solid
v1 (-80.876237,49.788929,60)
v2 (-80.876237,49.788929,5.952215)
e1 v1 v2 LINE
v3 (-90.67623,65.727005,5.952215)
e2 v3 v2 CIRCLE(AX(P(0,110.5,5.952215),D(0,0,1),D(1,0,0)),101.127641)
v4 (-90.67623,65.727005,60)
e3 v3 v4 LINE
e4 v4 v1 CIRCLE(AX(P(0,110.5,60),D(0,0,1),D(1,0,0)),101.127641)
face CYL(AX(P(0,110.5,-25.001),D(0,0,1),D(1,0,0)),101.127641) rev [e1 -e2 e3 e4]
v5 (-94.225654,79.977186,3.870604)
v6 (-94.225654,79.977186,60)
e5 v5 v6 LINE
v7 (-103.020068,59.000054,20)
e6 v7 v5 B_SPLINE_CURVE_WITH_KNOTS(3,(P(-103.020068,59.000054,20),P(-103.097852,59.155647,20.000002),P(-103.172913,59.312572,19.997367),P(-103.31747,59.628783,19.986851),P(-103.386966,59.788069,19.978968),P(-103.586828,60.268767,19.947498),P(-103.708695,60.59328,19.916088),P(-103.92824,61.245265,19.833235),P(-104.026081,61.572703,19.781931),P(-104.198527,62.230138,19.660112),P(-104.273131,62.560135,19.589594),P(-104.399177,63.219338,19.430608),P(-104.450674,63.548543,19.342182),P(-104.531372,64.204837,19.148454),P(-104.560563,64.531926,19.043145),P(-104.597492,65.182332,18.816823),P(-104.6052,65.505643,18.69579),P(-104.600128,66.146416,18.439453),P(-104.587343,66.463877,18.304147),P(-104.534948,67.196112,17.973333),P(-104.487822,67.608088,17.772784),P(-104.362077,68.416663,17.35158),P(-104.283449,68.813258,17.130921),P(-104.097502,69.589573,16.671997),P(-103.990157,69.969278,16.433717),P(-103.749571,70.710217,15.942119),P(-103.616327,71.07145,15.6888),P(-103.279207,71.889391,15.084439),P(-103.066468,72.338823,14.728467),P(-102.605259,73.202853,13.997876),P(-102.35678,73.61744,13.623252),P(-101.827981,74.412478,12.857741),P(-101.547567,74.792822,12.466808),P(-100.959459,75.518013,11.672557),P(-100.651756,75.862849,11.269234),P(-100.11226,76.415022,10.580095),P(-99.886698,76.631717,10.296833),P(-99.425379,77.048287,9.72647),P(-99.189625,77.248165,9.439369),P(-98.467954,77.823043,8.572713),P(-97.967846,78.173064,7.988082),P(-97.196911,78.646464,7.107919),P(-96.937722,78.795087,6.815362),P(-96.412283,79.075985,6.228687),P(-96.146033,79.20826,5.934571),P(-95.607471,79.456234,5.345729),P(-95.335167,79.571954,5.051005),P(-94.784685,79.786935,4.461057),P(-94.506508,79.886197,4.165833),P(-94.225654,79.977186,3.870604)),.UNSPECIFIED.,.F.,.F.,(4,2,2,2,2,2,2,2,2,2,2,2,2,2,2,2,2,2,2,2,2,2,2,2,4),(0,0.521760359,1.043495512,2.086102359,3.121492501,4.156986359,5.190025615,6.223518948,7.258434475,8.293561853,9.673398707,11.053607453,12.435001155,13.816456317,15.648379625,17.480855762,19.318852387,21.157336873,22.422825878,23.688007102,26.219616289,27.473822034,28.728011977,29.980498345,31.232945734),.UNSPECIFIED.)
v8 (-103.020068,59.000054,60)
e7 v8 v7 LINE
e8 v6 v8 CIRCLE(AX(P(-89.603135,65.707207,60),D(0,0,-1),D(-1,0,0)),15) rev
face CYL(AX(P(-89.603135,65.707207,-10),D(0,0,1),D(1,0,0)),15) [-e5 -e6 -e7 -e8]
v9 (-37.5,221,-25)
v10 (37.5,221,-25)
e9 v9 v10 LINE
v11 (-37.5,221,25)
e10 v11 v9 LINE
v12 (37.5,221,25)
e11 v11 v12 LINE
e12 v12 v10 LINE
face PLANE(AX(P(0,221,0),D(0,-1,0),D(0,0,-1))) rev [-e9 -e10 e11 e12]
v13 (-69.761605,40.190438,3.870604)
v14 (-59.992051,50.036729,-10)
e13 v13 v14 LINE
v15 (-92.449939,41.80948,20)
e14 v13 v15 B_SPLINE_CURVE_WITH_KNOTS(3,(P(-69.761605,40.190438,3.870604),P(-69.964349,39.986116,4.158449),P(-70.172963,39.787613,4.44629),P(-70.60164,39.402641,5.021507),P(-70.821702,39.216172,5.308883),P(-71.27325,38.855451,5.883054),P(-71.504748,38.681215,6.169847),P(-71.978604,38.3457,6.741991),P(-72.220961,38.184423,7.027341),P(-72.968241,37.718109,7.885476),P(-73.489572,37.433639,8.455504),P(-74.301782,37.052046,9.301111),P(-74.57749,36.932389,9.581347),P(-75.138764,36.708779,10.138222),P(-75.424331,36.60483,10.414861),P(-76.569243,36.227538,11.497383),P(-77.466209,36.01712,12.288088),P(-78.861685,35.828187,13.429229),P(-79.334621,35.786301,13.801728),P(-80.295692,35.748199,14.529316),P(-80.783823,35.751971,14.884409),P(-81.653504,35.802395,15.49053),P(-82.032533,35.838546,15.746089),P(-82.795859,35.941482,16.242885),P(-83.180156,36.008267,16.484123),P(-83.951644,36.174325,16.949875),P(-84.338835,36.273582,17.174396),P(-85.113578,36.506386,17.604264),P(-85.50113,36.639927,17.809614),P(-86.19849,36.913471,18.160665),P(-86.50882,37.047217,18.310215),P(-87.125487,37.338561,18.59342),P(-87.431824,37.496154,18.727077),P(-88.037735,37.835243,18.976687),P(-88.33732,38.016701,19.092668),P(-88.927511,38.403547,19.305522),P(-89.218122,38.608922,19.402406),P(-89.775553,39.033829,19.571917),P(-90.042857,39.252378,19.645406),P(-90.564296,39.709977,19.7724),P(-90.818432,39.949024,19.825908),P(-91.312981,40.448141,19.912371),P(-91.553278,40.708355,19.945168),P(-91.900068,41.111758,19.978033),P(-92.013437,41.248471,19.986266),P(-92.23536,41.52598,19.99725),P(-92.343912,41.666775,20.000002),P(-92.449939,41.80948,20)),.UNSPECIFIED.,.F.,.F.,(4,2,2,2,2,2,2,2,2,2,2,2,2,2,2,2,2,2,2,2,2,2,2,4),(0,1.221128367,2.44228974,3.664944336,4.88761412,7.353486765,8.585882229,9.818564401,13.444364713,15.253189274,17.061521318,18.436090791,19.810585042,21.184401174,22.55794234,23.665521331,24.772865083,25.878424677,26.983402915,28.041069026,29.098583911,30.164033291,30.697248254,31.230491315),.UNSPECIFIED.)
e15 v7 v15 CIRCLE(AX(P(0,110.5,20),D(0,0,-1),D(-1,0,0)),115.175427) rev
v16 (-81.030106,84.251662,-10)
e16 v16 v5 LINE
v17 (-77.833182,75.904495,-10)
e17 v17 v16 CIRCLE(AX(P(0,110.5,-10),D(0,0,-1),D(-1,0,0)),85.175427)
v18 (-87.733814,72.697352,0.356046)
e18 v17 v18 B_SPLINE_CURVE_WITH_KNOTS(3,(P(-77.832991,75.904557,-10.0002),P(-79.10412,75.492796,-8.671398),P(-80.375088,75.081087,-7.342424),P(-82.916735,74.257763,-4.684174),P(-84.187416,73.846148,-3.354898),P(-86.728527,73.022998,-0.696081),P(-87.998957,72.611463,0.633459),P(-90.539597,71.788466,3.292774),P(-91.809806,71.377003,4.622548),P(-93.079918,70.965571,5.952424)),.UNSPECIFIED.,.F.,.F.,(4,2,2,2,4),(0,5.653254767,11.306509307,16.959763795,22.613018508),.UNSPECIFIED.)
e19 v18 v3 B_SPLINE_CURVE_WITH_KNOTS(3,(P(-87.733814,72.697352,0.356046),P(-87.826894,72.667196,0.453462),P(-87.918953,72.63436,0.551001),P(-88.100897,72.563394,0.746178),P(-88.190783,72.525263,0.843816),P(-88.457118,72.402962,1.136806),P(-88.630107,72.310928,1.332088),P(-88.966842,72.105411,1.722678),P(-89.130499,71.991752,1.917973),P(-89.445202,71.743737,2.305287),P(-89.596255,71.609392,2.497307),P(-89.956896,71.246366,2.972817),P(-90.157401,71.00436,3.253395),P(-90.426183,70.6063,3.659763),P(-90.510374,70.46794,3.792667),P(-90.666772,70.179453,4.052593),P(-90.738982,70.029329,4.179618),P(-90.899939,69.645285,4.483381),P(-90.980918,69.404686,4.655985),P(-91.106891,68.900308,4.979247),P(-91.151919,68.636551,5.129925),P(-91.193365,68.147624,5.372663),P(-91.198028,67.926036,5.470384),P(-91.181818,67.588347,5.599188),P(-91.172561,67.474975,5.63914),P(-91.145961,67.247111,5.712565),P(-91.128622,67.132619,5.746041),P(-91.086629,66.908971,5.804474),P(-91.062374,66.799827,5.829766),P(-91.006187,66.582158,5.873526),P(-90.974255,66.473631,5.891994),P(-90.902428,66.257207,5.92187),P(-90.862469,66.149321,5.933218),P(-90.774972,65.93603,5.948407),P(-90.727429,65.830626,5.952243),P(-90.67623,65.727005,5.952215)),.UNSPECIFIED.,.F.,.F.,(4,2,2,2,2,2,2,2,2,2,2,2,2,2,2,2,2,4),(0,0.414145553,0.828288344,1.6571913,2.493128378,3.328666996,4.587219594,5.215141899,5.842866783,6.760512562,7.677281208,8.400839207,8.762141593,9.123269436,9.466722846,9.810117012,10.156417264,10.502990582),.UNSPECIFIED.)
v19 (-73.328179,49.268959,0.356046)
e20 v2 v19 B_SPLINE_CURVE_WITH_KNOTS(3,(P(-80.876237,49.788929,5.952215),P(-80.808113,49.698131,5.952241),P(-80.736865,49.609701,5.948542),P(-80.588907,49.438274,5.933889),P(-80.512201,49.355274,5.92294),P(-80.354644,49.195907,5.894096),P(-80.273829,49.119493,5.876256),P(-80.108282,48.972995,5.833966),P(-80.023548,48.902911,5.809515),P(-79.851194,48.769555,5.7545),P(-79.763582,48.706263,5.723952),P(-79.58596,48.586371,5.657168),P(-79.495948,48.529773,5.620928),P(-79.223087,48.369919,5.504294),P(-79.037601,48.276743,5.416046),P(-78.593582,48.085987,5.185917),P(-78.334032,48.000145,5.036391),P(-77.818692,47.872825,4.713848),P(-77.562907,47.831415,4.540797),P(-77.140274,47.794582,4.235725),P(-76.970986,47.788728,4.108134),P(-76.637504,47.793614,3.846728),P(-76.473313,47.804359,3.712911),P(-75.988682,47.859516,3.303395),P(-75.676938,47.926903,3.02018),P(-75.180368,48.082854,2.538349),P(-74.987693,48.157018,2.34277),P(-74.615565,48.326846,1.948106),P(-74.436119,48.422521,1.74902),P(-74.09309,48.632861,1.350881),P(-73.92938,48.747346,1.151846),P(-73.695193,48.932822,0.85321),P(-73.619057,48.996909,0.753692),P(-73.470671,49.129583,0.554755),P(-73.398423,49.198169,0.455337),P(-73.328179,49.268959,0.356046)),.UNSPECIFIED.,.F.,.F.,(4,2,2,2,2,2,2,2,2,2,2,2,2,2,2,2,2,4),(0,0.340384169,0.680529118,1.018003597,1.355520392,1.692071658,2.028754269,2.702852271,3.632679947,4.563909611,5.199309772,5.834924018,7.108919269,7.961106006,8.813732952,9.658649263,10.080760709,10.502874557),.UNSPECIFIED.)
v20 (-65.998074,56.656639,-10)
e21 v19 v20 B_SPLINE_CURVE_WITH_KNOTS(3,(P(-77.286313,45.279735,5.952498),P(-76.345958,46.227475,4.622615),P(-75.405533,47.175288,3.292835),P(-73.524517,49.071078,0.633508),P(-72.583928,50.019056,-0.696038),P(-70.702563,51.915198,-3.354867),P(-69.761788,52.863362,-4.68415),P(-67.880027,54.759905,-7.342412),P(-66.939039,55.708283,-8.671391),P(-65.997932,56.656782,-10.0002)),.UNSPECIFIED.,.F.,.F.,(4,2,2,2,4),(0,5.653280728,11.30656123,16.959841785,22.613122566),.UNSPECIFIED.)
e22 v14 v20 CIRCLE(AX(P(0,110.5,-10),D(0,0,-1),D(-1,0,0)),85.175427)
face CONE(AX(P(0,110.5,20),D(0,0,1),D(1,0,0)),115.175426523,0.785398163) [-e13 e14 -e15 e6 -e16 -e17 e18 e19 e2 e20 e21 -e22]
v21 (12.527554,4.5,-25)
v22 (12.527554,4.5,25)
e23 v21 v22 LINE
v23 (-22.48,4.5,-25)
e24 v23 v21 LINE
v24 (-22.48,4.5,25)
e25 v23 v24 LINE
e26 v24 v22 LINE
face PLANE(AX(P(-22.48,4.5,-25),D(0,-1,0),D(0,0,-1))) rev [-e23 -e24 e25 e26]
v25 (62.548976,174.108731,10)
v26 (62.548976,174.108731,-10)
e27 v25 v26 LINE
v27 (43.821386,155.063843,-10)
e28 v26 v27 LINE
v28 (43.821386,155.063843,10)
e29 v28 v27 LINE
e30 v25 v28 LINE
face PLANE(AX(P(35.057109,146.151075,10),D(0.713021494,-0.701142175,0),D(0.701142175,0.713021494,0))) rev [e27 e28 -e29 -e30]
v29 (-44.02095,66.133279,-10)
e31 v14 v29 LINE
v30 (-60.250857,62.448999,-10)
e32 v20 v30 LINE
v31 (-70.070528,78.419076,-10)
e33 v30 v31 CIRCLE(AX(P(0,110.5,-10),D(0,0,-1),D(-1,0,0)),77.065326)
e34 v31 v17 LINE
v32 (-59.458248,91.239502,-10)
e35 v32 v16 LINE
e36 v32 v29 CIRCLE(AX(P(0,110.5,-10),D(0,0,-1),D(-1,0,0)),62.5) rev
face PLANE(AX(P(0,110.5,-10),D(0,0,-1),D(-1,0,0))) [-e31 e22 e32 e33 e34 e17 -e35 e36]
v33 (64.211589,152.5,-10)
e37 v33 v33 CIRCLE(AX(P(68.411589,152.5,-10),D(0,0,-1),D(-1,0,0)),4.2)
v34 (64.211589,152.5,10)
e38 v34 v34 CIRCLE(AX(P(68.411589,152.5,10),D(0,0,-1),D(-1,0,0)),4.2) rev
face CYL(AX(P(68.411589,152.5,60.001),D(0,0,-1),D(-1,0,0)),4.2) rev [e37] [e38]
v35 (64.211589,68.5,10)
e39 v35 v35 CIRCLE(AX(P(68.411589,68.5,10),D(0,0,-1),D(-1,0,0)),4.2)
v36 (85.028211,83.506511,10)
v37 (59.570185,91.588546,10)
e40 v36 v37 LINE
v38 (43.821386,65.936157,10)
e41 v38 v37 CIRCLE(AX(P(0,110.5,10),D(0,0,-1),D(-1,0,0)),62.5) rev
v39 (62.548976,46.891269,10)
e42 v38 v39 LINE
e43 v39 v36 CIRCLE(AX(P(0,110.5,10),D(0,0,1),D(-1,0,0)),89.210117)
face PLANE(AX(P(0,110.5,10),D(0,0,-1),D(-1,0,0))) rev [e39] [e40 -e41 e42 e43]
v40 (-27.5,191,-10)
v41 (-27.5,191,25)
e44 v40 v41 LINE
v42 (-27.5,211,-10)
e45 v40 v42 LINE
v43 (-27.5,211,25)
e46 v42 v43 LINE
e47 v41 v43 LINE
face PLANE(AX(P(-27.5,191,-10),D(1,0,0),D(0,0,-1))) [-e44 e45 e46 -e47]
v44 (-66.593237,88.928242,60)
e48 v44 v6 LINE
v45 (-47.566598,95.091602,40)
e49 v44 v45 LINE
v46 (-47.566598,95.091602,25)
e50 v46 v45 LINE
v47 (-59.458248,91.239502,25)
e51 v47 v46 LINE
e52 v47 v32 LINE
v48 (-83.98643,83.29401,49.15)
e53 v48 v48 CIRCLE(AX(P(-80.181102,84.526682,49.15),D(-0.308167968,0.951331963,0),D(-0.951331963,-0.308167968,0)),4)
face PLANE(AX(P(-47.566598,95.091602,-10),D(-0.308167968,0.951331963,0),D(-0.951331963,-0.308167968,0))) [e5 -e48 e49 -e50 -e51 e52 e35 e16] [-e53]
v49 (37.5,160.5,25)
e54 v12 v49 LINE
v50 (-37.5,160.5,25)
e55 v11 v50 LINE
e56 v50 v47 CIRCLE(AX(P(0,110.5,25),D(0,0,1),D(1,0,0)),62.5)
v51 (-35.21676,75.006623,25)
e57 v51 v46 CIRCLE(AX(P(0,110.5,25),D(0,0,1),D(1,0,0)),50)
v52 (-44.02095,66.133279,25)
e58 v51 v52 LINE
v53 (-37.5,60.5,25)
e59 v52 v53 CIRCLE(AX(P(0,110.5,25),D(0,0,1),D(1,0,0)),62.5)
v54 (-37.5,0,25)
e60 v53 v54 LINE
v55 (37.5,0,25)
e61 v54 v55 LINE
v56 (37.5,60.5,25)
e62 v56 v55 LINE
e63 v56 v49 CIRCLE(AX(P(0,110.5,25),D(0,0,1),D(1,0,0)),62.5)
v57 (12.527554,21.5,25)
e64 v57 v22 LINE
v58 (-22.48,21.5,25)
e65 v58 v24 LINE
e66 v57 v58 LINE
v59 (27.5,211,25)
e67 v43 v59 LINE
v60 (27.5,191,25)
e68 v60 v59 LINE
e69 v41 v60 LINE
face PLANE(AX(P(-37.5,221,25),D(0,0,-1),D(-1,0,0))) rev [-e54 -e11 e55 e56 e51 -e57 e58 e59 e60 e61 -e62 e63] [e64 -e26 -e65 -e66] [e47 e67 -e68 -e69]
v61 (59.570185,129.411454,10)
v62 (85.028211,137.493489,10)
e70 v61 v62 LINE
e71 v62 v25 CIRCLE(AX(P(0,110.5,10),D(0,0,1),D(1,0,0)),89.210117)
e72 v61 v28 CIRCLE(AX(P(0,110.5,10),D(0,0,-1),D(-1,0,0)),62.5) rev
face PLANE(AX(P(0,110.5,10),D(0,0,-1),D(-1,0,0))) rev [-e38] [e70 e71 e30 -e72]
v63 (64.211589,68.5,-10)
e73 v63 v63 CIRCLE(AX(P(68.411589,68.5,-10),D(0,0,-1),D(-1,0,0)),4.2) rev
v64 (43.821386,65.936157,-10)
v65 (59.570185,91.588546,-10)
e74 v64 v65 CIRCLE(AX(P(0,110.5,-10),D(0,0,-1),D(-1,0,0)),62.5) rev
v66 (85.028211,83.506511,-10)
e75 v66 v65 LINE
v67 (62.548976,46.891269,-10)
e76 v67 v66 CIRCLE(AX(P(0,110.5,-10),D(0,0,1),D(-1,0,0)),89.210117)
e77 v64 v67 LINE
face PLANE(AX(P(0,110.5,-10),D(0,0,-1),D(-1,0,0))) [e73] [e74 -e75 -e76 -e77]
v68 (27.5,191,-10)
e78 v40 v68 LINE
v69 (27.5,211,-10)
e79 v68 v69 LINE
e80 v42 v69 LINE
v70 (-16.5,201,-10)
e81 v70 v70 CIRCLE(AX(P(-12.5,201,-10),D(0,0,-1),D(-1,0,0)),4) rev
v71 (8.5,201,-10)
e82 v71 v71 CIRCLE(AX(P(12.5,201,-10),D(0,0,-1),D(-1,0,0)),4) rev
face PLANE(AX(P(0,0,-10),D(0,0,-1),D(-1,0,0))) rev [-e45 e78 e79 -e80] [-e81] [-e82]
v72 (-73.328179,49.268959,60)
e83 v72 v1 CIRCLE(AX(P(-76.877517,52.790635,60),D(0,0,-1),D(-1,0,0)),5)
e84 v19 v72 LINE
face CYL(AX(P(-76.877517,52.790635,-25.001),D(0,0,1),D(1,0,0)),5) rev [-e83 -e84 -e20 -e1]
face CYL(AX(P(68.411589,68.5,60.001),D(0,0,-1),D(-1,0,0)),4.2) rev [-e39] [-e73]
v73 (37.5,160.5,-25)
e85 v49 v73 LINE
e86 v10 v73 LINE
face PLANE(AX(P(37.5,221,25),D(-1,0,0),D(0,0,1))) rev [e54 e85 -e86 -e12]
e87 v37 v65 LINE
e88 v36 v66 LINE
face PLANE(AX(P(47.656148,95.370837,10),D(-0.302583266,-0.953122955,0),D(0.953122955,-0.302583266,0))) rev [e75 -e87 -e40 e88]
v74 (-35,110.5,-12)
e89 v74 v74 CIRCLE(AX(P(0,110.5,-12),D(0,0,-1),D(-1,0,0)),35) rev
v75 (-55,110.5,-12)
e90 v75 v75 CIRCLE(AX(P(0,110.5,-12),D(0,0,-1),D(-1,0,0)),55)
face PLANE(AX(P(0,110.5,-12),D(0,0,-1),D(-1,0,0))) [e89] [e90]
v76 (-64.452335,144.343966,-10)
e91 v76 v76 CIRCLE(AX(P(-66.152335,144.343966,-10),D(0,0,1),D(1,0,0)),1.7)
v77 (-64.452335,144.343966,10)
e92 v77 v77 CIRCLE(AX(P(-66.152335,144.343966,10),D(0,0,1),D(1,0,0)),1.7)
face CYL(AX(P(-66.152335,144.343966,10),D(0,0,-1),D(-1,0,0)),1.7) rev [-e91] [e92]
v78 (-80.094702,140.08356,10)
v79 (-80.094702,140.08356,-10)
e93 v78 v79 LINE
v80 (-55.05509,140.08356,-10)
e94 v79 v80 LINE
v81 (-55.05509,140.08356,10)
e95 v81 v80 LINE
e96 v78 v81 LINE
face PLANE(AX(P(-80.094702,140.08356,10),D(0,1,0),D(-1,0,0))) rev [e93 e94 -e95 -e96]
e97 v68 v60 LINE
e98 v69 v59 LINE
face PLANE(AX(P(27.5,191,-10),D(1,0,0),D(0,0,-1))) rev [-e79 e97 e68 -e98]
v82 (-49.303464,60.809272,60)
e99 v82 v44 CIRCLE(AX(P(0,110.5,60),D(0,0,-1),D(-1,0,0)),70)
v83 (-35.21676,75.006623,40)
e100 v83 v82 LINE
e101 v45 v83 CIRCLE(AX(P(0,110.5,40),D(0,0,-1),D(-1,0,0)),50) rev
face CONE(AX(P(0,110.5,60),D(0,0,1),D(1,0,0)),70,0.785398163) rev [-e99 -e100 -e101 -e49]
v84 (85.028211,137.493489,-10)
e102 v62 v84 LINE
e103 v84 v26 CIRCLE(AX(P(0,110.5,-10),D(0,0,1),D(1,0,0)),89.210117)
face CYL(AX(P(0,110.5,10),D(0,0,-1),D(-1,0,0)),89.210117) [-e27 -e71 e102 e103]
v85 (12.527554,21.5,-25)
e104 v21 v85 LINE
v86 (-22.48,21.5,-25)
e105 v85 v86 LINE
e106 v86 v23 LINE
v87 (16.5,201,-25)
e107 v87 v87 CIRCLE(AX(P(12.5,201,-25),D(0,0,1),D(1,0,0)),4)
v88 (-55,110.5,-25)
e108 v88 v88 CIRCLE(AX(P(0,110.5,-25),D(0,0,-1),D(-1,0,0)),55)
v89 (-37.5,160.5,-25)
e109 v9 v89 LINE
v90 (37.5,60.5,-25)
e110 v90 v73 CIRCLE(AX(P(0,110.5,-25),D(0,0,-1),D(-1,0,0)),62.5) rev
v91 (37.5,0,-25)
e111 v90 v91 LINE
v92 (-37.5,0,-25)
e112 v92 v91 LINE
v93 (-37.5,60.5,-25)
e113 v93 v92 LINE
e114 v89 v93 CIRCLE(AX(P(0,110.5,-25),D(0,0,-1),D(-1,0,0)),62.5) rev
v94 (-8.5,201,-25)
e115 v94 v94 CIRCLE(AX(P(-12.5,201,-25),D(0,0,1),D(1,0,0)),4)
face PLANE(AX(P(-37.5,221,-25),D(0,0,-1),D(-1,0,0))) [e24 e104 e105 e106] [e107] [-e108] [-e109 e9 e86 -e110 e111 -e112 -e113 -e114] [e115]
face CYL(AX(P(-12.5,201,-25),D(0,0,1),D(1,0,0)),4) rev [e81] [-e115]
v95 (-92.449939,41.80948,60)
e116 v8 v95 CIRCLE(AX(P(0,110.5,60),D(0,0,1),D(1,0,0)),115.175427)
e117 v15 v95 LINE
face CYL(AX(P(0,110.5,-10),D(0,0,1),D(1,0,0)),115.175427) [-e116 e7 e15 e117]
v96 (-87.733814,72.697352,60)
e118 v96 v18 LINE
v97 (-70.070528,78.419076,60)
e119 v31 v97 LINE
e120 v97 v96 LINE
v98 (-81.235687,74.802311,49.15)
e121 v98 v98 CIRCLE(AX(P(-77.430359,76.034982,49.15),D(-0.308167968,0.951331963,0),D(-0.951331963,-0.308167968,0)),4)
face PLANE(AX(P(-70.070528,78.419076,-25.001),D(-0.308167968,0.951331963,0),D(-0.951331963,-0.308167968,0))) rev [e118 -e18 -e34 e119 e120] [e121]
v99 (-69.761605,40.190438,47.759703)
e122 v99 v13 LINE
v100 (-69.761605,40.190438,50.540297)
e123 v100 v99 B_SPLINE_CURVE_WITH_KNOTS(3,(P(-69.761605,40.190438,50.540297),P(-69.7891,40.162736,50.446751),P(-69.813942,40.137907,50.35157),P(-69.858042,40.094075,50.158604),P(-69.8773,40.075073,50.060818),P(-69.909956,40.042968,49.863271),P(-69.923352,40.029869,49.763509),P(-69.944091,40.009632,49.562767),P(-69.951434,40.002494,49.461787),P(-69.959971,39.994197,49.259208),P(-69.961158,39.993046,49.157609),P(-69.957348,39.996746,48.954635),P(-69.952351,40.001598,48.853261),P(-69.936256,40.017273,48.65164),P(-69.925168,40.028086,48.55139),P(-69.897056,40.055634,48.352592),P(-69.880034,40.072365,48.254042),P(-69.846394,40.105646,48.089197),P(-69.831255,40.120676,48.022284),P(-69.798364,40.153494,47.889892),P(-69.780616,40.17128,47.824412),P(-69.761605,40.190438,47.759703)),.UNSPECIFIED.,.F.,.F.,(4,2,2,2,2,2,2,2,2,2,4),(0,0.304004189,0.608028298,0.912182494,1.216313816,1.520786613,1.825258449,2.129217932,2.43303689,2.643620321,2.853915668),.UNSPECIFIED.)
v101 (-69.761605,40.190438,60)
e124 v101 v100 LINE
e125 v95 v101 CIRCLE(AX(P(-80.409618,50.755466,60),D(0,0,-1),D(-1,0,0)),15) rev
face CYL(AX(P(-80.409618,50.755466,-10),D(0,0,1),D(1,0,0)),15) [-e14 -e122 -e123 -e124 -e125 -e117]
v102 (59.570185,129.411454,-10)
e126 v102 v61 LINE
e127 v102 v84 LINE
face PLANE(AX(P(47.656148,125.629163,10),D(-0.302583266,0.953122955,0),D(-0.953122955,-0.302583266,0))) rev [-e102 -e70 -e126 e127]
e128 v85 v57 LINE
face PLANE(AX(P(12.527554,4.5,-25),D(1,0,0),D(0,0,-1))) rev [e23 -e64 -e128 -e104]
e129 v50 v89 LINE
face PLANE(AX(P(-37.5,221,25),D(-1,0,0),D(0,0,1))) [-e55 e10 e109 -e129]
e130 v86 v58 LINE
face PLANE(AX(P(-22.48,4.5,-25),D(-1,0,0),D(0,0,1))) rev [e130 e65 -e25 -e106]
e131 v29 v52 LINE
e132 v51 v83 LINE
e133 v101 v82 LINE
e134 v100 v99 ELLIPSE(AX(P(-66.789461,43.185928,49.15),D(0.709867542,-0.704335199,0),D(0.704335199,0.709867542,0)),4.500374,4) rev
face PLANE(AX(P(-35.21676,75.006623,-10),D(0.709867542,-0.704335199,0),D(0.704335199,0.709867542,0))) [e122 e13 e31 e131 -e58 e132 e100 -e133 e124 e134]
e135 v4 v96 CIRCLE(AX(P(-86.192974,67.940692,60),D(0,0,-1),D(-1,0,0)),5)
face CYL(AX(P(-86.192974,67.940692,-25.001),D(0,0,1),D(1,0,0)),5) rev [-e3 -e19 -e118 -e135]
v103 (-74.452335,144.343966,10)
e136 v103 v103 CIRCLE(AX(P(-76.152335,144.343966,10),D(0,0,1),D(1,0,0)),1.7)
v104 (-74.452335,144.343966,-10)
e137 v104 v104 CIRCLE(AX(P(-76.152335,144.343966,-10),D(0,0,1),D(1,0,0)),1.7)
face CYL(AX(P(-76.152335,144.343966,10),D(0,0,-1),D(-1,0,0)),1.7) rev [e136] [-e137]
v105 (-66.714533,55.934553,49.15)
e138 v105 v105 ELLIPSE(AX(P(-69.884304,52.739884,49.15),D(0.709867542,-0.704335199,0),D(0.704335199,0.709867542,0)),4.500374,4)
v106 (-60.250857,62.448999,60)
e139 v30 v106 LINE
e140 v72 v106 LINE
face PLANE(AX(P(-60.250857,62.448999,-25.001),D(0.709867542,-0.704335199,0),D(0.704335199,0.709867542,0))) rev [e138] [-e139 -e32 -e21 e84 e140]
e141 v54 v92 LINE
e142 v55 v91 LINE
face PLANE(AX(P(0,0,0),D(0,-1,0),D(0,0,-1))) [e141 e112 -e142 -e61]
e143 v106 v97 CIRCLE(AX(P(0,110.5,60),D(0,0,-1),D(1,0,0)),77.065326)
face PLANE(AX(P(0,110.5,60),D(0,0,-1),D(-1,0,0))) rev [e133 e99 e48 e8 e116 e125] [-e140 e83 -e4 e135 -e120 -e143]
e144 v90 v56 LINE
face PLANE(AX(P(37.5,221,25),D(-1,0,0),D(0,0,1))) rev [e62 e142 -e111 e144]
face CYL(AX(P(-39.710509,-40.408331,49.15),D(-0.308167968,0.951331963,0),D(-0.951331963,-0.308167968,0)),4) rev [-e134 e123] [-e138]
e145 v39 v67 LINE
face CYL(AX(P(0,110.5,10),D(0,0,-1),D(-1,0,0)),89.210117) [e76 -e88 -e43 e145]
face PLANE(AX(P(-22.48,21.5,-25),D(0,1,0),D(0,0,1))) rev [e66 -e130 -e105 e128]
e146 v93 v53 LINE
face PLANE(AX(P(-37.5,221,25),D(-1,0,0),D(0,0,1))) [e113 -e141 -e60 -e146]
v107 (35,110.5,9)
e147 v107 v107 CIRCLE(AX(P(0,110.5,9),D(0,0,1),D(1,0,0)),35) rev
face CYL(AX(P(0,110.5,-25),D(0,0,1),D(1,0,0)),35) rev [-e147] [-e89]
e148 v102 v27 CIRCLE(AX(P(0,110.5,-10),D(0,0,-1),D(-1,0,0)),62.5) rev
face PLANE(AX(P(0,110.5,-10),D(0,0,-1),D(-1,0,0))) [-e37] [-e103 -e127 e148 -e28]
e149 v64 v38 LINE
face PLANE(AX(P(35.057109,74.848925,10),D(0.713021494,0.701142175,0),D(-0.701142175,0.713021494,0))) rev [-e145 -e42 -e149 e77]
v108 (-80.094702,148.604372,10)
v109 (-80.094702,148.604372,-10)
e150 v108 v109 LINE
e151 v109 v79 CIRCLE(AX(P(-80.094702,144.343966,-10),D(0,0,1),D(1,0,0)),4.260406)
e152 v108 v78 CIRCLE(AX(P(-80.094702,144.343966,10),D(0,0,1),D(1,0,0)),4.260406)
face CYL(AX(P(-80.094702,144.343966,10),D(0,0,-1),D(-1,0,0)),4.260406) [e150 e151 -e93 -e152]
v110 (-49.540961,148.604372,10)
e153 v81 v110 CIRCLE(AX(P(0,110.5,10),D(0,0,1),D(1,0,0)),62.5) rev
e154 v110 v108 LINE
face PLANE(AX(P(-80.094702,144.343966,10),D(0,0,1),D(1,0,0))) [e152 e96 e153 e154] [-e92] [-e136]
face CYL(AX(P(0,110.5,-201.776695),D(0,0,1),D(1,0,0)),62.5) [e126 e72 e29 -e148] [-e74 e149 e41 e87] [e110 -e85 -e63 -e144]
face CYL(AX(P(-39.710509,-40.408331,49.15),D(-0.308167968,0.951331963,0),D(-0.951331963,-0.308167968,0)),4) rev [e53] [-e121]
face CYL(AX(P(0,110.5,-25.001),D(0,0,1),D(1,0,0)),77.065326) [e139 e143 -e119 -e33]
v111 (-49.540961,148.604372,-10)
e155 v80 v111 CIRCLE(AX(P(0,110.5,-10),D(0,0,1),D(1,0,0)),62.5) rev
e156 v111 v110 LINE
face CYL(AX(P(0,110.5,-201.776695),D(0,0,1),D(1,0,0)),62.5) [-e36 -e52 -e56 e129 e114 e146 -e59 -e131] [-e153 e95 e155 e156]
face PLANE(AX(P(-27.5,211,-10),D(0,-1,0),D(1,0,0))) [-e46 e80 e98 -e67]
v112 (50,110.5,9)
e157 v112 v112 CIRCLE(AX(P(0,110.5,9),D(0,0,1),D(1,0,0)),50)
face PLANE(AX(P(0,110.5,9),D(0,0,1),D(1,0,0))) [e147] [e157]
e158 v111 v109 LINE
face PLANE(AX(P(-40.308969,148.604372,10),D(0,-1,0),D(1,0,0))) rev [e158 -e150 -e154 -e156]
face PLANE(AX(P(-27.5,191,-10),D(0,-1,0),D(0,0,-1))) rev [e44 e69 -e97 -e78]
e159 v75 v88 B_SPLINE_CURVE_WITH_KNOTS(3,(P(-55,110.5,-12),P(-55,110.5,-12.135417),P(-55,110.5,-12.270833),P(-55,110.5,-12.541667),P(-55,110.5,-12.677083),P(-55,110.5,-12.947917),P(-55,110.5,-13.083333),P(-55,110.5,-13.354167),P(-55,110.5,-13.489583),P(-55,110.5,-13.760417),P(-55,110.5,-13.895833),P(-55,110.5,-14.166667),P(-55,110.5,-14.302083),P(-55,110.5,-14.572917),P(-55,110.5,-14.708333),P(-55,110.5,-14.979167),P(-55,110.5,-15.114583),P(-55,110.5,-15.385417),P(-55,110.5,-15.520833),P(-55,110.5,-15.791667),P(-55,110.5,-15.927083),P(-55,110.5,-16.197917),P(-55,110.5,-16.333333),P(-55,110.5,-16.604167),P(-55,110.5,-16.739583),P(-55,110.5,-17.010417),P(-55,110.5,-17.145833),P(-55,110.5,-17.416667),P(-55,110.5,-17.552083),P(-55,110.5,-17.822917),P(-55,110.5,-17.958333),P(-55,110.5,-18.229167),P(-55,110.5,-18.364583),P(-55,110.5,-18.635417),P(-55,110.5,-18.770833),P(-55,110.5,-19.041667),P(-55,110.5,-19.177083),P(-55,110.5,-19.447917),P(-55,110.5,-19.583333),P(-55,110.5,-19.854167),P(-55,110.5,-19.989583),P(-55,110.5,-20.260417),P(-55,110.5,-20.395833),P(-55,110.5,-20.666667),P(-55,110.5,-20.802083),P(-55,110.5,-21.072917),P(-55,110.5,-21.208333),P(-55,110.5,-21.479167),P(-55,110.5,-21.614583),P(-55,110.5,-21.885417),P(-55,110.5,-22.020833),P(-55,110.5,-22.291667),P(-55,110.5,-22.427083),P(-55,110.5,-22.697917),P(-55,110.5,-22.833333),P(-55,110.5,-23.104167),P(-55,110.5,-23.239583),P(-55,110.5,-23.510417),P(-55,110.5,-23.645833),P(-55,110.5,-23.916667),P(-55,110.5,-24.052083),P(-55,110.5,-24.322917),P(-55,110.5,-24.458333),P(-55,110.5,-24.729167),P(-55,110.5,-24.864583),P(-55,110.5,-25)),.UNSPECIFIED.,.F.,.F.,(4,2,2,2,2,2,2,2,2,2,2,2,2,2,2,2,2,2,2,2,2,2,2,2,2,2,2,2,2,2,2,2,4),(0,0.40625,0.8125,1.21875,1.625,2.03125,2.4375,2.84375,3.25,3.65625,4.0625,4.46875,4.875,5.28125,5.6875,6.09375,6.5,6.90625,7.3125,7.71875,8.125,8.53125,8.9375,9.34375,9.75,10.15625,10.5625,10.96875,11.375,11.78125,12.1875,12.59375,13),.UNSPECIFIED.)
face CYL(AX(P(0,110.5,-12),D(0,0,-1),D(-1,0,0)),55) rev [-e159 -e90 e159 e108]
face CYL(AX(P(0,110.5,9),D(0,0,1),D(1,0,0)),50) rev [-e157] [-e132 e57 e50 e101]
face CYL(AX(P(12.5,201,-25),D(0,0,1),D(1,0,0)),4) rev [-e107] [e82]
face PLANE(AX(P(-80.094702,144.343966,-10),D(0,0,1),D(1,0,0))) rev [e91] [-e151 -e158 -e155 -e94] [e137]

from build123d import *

# Parameters (mm, degrees)
SKETCH1_W                          = 75
SKETCH1_H                          = 50.00000000000001
BE_MAIN_UPRIGHT_BODY_DEPTH         = 221
SKETCH19_R                         = 62.5
BOSS_EXTRUDE1_DEPTH                = 50
SKETCH4_R                          = 35
CE_THROUGH_HOLE_DEPTH              = 236.04733565816056
SKETCH2_R                          = 50
CE_INNER_BEARING_DEPTH             = 16
SKETCH3_R                          = 55
CE_OUTER_BEARING_DEPTH             = 13
BE_CALIPER_MOUNT_V2_DEPTH          = 10
BE_TIE_ROD_MOUNT_V2_DEPTH          = 60.00000000000001
BE_TIE_ROD_MOUNT_V2_DEPTH_BACK     = 9.999999999999996
SKETCH32_R                         = 1.7000000000000146
BE_TEMP_SENSOR_MOUNT_V3_DEPTH      = 10
CE_CALIPER_HOLES_REACH             = 255.863
SKETCH26_R                         = 4.199999999999994
SKETCH26_R_2                       = 4.1999999999999975
CE_CALIPER_HOLES_DIRECTION_2_REACH = 255.863
SKETCH12_R                         = 4.0000000000000036
SKETCH12_R_2                       = 4
CE_TOP_CLEVIS_HOLES_DEPTH          = 252.68750278067682
CE_TOP_CLEVIS_SPACE_DEPTH          = 35
CE_BOTTOM_CLEVIS_SPACE_DEPTH       = 252.68750278067682
SKETCH15_W                         = 25.000000000000004
SKETCH15_H                         = 5
CE_EXPAND_BOTTOM_CLEVIS_DEPTH      = 252.68750278067682
CE_WIDEN_BOTTOM_CLEVIS_DEPTH       = 249.87031277664735
CE_WIDEN_BOTTOM_CLEVIS_DEPTH_BACK  = 249.87031277664735
SKETCH16_W                         = 10.00755403153164
SKETCH16_H                         = 17
CHAMFER1_SIZE                      = 20
CHAMFER2_SIZE                      = 30
CUT_EXTRUDE1_REACH                 = 180.963
SKETCH28_R                         = 4.000000000000007
CUT_EXTRUDE2_REACH                 = 262.905
FILLET2_R                          = 15
FILLET3_R                          = 5


with BuildPart() as part:
    # Sketch1 → BE - main upright body (new body)
    with BuildSketch(Plane(origin=(0, 0, 0), x_dir=(1, 0, 0), z_dir=(0, 1, 0))):
        Rectangle(SKETCH1_W, SKETCH1_H)
    extrude(amount=BE_MAIN_UPRIGHT_BODY_DEPTH)

    # Sketch19 → Boss-Extrude1 (add)
    with BuildSketch(Plane.XY.offset(25)):
        with Locations((0, 110.5)):
            Circle(SKETCH19_R)
    extrude(amount=-BOSS_EXTRUDE1_DEPTH)

    # Sketch4 → CE - Through hole (cut, through all)
    with BuildSketch(Plane.XY.offset(25)):
        with Locations((6.57e-15, 110.5)):
            Circle(SKETCH4_R)
    extrude(amount=-CE_THROUGH_HOLE_DEPTH, mode=Mode.SUBTRACT)

    # Sketch2 → CE - Inner bearing (cut)
    with BuildSketch(Plane.XY.offset(25)):
        with Locations((5.2e-15, 110.5)):
            Circle(SKETCH2_R)
    extrude(amount=-CE_INNER_BEARING_DEPTH, mode=Mode.SUBTRACT)

    # Sketch3 → CE - Outer bearing (cut)
    with BuildSketch(Plane(origin=(0, 0, -25), x_dir=(-1, 0, 0), z_dir=(0, 0, -1))):
        with Locations((0, 110.5)):
            Circle(SKETCH3_R)
    extrude(amount=-CE_OUTER_BEARING_DEPTH, mode=Mode.SUBTRACT)

    # Sketch23 → BE - caliper mount v2 (add, symmetric)
    with BuildSketch(Plane.XY):
        with BuildLine():
            Line((35.05710874811726, 146.15107468538196), (62.54897572629606, 174.1087311459216))
            ThreePointArc((62.54897572629606, 174.1087311459216), (76.02582114581824, 157.1746136728197), (85.02821067036592, 137.4934887074417))
            Line((85.02821067036592, 137.4934887074417), (47.65614773889368, 125.62916331753813))
            ThreePointArc((47.65614773889368, 125.62916331753813), (42.610537560783285, 136.65993288946052), (35.05710874811726, 146.15107468538196))
        make_face()
        with BuildLine():
            Line((35.05710874811726, 74.84892531461804), (62.54897572629606, 46.89126885407838))
            ThreePointArc((62.54897572629606, 46.89126885407838), (76.02582114581824, 63.82538632718028), (85.02821067036592, 83.50651129255829))
            Line((85.02821067036592, 83.50651129255829), (47.65614773889368, 95.37083668246188))
            ThreePointArc((47.65614773889368, 95.37083668246188), (42.61053756078329, 84.34006711053948), (35.05710874811726, 74.84892531461804))
        make_face()
    extrude(amount=BE_CALIPER_MOUNT_V2_DEPTH, both=True)

    # Sketch24 → BE - tie rod mount v2 (add, two sides: drawn at the far end of the back side and taken through both)
    with BuildSketch(Plane.XY.offset(-BE_TIE_ROD_MOUNT_V2_DEPTH_BACK)):
        with BuildLine():
            Line((-35.21675994796843, 75.00662288866886), (-81.12210695526274, 28.74070304926003))
            ThreePointArc((-81.12210695526274, 28.74070304926003), (-98.11223118223046, 50.172817344210976), (-109.57006459783258, 75.00662288866886))
            Line((-109.57006459783258, 75.00662288866886), (-47.56659814757113, 95.0916016190039))
            ThreePointArc((-47.56659814757113, 95.0916016190039), (-42.592519144130065, 84.31074050384561), (-35.21675994796843, 75.00662288866886))
        make_face()
    extrude(amount=BE_TIE_ROD_MOUNT_V2_DEPTH + BE_TIE_ROD_MOUNT_V2_DEPTH_BACK)

    # Sketch32 → BE - temp sensor mount v3 (add, symmetric)
    with BuildSketch(Plane.XY):
        with BuildLine():
            Line((-40.308968964609726, 148.60437176531212), (-80.09470245298189, 148.60437176531215))
            ThreePointArc((-80.09470245298189, 148.60437176531215), (-84.35510834631509, 144.34396587197895), (-80.09470245298189, 140.08355997864578))
            Line((-80.09470245298189, 140.08355997864578), (-40.30896896460972, 140.08355997864575))
            Line((-40.30896896460972, 140.08355997864575), (-40.308968964609726, 148.60437176531212))
        make_face()
        with Locations((-76.1523345656343, 144.34396587197895)):
            Circle(SKETCH32_R, mode=Mode.SUBTRACT)
        with Locations((-66.1523345656343, 144.34396587197895)):
            Circle(SKETCH32_R, mode=Mode.SUBTRACT)
    extrude(amount=BE_TEMP_SENSOR_MOUNT_V3_DEPTH, both=True)

    # Sketch26 → CE - caliper holes (cut, up to next)
    with BuildSketch(Plane.XY, mode=Mode.PRIVATE) as ce_caliper_holes_sk1:
        with Locations(Location((68.41158901726085, 68.50000000000001, 0), (0, 0, 180))):
            Circle(SKETCH26_R)
    ce_caliper_holes_tool1 = extrude(ce_caliper_holes_sk1.sketch, amount=-CE_CALIPER_HOLES_REACH, mode=Mode.PRIVATE) & part.part
    # Sketch26 → CE - caliper holes (cut, up to next)
    with BuildSketch(Plane.XY, mode=Mode.PRIVATE) as ce_caliper_holes_sk2:
        with Locations(Location((68.41158901726085, 152.49999999999997, 0), (0, 0, 180))):
            Circle(SKETCH26_R_2)
    ce_caliper_holes_tool2 = extrude(ce_caliper_holes_sk2.sketch, amount=-CE_CALIPER_HOLES_REACH, mode=Mode.PRIVATE) & part.part
    add(ce_caliper_holes_tool1.solids().sort_by_distance((68.411589, 68.5, 0))[0], mode=Mode.SUBTRACT)
    add(ce_caliper_holes_tool2.solids().sort_by_distance((68.411589, 152.5, 0))[0], mode=Mode.SUBTRACT)

    # Sketch26 → CE - caliper holes direction 2 (cut, up to next)
    with BuildSketch(Plane.XY, mode=Mode.PRIVATE) as ce_caliper_holes_direction_2_sk1:
        with Locations(Location((68.41158901726085, 68.50000000000001, 0), (0, 0, 180))):
            Circle(SKETCH26_R)
    ce_caliper_holes_direction_2_tool1 = extrude(ce_caliper_holes_direction_2_sk1.sketch, amount=CE_CALIPER_HOLES_DIRECTION_2_REACH, mode=Mode.PRIVATE) & part.part
    # Sketch26 → CE - caliper holes direction 2 (cut, up to next)
    with BuildSketch(Plane.XY, mode=Mode.PRIVATE) as ce_caliper_holes_direction_2_sk2:
        with Locations(Location((68.41158901726085, 152.49999999999997, 0), (0, 0, 180))):
            Circle(SKETCH26_R_2)
    ce_caliper_holes_direction_2_tool2 = extrude(ce_caliper_holes_direction_2_sk2.sketch, amount=CE_CALIPER_HOLES_DIRECTION_2_REACH, mode=Mode.PRIVATE) & part.part
    add(ce_caliper_holes_direction_2_tool1.solids().sort_by_distance((68.411589, 68.5, 0))[0], mode=Mode.SUBTRACT)
    add(ce_caliper_holes_direction_2_tool2.solids().sort_by_distance((68.411589, 152.5, 0))[0], mode=Mode.SUBTRACT)

    # Sketch12 → CE - top clevis holes (cut, through all)
    with BuildSketch(Plane.XY.offset(25)):
        with Locations((-12.5, 201)):
            Circle(SKETCH12_R)
        with Locations((12.5, 201)):
            Circle(SKETCH12_R_2)
    extrude(amount=-CE_TOP_CLEVIS_HOLES_DEPTH, mode=Mode.SUBTRACT)

    # Sketch13 → CE - top clevis space (cut)
    with BuildSketch(Plane.XY.offset(25)):
        Polygon((-27.499999999999968, 191.00000000000006), (27.500000000000032, 191.00000000000006), (27.500000000000032, 211.00000000000003), (-27.499999999999968, 211.00000000000006), align=None)
    extrude(amount=-CE_TOP_CLEVIS_SPACE_DEPTH, mode=Mode.SUBTRACT)

    # Sketch14 → CE - bottom clevis space (cut, through all)
    with BuildSketch(Plane.XY.offset(25)):
        Polygon((-22.48000000000002, 4.500000000000011), (2.5199999999999796, 4.500000000000011), (2.51999999999998, 16.50000000000001), (-22.48000000000002, 16.50000000000001), align=None)
    extrude(amount=-CE_BOTTOM_CLEVIS_SPACE_DEPTH, mode=Mode.SUBTRACT)

    # Sketch15 → CE - expand bottom clevis (cut, through all)
    with BuildSketch(Plane.XY.offset(25)):
        with Locations((-9.98000000000002, 19.00000000000001)):
            Rectangle(SKETCH15_W, SKETCH15_H)
    extrude(amount=-CE_EXPAND_BOTTOM_CLEVIS_DEPTH, mode=Mode.SUBTRACT)

    # Sketch16 → CE - widen bottom clevis (cut, two sides: drawn at the far end of the back side and taken through both)
    with BuildSketch(Plane(origin=(2.5199999999999796, 4.500000000000011, 25), x_dir=(1, 0, 0), z_dir=(0, 0, 1)).offset(-CE_WIDEN_BOTTOM_CLEVIS_DEPTH_BACK)):
        with Locations((5.00377701576582, 8.5)):
            Rectangle(SKETCH16_W, SKETCH16_H)
    extrude(amount=CE_WIDEN_BOTTOM_CLEVIS_DEPTH + CE_WIDEN_BOTTOM_CLEVIS_DEPTH_BACK, mode=Mode.SUBTRACT)

    # Chamfer1
    chamfer1_edges = [part.edges().sort_by_distance(p)[0] for p in [
        (-42.592519144130065, 84.31074050384561, 60.00000000000001),
    ]]
    chamfer(chamfer1_edges, length=CHAMFER1_SIZE)

    # Chamfer2
    chamfer2_edges = [part.edges().sort_by_distance(p)[0] for p in [
        (-98.11223118223045, 50.17281734421098, -9.999999999999996),
    ]]
    chamfer(chamfer2_edges, length=CHAMFER2_SIZE)

    # Cut-Extrude1: up to this plane
    cut_extrude1_end = Plane(origin=(-35.21675994796843, 75.00662288866886, -9.999999999999996), z_dir=(0.7098675422266223, -0.7043351989593695, 0))
    # Sketch28 → Cut-Extrude1 (cut, up to the surface)
    with BuildSketch(Plane(origin=(-32.39528914978471, 100.00609166249728, 0), x_dir=(0.951331962951422, 0.3081679676199239, 0), z_dir=(-0.3081679676199238, 0.9513319629514219, 0)), mode=Mode.PRIVATE) as cut_extrude1_sk1:
        with Locations(Location((-50.230429584814566, -49.15, 0), (0, 0, 180))):
            Circle(SKETCH28_R)
    cut_extrude1_tool1 = split(extrude(cut_extrude1_sk1.sketch, amount=-CUT_EXTRUDE1_REACH, mode=Mode.PRIVATE), bisect_by=cut_extrude1_end, keep=Keep.BOTH, mode=Mode.PRIVATE)
    add(cut_extrude1_tool1.solids().sort_by_distance((-80.181102, 84.526682, 49.15))[0], mode=Mode.SUBTRACT)

    # Sketch29 → Cut-Extrude2 (cut, up to next)
    with BuildSketch(Plane.XY.offset(60.00000000000001), mode=Mode.PRIVATE) as cut_extrude2_sk1:
        with BuildLine():
            Line((-70.0705275210271, 78.4190759215617), (-93.07971814036846, 70.96563612779761))
            ThreePointArc((-93.07971814036846, 70.96563612779761), (-86.14562004973435, 57.53083914090252), (-77.28611251700346, 45.279936615492176))
            Line((-77.28611251700346, 45.279936615492176), (-60.250857228734134, 62.4489987616883))
            ThreePointArc((-60.250857228734134, 62.4489987616883), (-65.64812771052121, 70.13432343060958), (-70.0705275210271, 78.4190759215617))
        make_face()
    cut_extrude2_tool1 = extrude(cut_extrude2_sk1.sketch, amount=-CUT_EXTRUDE2_REACH, mode=Mode.PRIVATE) & part.part
    add(cut_extrude2_tool1.solids().sort_by_distance((-76.449162, 63.492991, 60))[0], mode=Mode.SUBTRACT)

    # Fillet2
    # the kernel refuses this fillet: 15 mm, written as the material it takes off along each edge
    with BuildSketch(Plane(origin=(-81.12210695526272, 28.740703049260055, -23.23718779420447), x_dir=(0.70433519895937, 0.7098675422266219, 0), z_dir=(0, 0, 1))) as fillet2_piece_1:
        with BuildLine():
            CenterArc((16.129396420502527, 15.000000000000002), FILLET2_R, 171.38829576022673, 98.6117042397733)
            ThreePointArc((1.2985092148828912, 17.246059815362816), (0.3250860863217871, 8.647437558840888), (0, 0))
            Line((0, 0), (16.12939642050253, 3.6e-16))
        make_face()
    extrude(amount=126.47437558840895, mode=Mode.SUBTRACT)
    with BuildSketch(Plane(origin=(-109.57006459783257, 75.00662288866886, 103.23718779420446), x_dir=(0.3787247076655996, -0.9255093709971856, 0), z_dir=(0, 0, -1))) as fillet2_piece_2:
        with BuildLine():
            CenterArc((16.16866645235697, -14.957662051341691), FILLET2_R, 85.69414788011332, 98.61170423977336)
            Line((1.2110044010152803, -16.083870716666514), (0, 0))
            ThreePointArc((0, 0), (8.6474375588409, 0.3250860863217989), (17.29487511768179, -4.5e-16))
        make_face()
    extrude(amount=126.47437558840892, mode=Mode.SUBTRACT)

    # Fillet3
    fillet3_edges = [part.edges().sort_by_distance(p)[0] for p in [
        (-77.28611251700346, 45.279936615492176, 32.976107440368864),
        (-93.07971814036846, 70.96563612779761, 32.976107440368864),
    ]]
    fillet(fillet3_edges, radius=FILLET3_R)


solid = part.part
